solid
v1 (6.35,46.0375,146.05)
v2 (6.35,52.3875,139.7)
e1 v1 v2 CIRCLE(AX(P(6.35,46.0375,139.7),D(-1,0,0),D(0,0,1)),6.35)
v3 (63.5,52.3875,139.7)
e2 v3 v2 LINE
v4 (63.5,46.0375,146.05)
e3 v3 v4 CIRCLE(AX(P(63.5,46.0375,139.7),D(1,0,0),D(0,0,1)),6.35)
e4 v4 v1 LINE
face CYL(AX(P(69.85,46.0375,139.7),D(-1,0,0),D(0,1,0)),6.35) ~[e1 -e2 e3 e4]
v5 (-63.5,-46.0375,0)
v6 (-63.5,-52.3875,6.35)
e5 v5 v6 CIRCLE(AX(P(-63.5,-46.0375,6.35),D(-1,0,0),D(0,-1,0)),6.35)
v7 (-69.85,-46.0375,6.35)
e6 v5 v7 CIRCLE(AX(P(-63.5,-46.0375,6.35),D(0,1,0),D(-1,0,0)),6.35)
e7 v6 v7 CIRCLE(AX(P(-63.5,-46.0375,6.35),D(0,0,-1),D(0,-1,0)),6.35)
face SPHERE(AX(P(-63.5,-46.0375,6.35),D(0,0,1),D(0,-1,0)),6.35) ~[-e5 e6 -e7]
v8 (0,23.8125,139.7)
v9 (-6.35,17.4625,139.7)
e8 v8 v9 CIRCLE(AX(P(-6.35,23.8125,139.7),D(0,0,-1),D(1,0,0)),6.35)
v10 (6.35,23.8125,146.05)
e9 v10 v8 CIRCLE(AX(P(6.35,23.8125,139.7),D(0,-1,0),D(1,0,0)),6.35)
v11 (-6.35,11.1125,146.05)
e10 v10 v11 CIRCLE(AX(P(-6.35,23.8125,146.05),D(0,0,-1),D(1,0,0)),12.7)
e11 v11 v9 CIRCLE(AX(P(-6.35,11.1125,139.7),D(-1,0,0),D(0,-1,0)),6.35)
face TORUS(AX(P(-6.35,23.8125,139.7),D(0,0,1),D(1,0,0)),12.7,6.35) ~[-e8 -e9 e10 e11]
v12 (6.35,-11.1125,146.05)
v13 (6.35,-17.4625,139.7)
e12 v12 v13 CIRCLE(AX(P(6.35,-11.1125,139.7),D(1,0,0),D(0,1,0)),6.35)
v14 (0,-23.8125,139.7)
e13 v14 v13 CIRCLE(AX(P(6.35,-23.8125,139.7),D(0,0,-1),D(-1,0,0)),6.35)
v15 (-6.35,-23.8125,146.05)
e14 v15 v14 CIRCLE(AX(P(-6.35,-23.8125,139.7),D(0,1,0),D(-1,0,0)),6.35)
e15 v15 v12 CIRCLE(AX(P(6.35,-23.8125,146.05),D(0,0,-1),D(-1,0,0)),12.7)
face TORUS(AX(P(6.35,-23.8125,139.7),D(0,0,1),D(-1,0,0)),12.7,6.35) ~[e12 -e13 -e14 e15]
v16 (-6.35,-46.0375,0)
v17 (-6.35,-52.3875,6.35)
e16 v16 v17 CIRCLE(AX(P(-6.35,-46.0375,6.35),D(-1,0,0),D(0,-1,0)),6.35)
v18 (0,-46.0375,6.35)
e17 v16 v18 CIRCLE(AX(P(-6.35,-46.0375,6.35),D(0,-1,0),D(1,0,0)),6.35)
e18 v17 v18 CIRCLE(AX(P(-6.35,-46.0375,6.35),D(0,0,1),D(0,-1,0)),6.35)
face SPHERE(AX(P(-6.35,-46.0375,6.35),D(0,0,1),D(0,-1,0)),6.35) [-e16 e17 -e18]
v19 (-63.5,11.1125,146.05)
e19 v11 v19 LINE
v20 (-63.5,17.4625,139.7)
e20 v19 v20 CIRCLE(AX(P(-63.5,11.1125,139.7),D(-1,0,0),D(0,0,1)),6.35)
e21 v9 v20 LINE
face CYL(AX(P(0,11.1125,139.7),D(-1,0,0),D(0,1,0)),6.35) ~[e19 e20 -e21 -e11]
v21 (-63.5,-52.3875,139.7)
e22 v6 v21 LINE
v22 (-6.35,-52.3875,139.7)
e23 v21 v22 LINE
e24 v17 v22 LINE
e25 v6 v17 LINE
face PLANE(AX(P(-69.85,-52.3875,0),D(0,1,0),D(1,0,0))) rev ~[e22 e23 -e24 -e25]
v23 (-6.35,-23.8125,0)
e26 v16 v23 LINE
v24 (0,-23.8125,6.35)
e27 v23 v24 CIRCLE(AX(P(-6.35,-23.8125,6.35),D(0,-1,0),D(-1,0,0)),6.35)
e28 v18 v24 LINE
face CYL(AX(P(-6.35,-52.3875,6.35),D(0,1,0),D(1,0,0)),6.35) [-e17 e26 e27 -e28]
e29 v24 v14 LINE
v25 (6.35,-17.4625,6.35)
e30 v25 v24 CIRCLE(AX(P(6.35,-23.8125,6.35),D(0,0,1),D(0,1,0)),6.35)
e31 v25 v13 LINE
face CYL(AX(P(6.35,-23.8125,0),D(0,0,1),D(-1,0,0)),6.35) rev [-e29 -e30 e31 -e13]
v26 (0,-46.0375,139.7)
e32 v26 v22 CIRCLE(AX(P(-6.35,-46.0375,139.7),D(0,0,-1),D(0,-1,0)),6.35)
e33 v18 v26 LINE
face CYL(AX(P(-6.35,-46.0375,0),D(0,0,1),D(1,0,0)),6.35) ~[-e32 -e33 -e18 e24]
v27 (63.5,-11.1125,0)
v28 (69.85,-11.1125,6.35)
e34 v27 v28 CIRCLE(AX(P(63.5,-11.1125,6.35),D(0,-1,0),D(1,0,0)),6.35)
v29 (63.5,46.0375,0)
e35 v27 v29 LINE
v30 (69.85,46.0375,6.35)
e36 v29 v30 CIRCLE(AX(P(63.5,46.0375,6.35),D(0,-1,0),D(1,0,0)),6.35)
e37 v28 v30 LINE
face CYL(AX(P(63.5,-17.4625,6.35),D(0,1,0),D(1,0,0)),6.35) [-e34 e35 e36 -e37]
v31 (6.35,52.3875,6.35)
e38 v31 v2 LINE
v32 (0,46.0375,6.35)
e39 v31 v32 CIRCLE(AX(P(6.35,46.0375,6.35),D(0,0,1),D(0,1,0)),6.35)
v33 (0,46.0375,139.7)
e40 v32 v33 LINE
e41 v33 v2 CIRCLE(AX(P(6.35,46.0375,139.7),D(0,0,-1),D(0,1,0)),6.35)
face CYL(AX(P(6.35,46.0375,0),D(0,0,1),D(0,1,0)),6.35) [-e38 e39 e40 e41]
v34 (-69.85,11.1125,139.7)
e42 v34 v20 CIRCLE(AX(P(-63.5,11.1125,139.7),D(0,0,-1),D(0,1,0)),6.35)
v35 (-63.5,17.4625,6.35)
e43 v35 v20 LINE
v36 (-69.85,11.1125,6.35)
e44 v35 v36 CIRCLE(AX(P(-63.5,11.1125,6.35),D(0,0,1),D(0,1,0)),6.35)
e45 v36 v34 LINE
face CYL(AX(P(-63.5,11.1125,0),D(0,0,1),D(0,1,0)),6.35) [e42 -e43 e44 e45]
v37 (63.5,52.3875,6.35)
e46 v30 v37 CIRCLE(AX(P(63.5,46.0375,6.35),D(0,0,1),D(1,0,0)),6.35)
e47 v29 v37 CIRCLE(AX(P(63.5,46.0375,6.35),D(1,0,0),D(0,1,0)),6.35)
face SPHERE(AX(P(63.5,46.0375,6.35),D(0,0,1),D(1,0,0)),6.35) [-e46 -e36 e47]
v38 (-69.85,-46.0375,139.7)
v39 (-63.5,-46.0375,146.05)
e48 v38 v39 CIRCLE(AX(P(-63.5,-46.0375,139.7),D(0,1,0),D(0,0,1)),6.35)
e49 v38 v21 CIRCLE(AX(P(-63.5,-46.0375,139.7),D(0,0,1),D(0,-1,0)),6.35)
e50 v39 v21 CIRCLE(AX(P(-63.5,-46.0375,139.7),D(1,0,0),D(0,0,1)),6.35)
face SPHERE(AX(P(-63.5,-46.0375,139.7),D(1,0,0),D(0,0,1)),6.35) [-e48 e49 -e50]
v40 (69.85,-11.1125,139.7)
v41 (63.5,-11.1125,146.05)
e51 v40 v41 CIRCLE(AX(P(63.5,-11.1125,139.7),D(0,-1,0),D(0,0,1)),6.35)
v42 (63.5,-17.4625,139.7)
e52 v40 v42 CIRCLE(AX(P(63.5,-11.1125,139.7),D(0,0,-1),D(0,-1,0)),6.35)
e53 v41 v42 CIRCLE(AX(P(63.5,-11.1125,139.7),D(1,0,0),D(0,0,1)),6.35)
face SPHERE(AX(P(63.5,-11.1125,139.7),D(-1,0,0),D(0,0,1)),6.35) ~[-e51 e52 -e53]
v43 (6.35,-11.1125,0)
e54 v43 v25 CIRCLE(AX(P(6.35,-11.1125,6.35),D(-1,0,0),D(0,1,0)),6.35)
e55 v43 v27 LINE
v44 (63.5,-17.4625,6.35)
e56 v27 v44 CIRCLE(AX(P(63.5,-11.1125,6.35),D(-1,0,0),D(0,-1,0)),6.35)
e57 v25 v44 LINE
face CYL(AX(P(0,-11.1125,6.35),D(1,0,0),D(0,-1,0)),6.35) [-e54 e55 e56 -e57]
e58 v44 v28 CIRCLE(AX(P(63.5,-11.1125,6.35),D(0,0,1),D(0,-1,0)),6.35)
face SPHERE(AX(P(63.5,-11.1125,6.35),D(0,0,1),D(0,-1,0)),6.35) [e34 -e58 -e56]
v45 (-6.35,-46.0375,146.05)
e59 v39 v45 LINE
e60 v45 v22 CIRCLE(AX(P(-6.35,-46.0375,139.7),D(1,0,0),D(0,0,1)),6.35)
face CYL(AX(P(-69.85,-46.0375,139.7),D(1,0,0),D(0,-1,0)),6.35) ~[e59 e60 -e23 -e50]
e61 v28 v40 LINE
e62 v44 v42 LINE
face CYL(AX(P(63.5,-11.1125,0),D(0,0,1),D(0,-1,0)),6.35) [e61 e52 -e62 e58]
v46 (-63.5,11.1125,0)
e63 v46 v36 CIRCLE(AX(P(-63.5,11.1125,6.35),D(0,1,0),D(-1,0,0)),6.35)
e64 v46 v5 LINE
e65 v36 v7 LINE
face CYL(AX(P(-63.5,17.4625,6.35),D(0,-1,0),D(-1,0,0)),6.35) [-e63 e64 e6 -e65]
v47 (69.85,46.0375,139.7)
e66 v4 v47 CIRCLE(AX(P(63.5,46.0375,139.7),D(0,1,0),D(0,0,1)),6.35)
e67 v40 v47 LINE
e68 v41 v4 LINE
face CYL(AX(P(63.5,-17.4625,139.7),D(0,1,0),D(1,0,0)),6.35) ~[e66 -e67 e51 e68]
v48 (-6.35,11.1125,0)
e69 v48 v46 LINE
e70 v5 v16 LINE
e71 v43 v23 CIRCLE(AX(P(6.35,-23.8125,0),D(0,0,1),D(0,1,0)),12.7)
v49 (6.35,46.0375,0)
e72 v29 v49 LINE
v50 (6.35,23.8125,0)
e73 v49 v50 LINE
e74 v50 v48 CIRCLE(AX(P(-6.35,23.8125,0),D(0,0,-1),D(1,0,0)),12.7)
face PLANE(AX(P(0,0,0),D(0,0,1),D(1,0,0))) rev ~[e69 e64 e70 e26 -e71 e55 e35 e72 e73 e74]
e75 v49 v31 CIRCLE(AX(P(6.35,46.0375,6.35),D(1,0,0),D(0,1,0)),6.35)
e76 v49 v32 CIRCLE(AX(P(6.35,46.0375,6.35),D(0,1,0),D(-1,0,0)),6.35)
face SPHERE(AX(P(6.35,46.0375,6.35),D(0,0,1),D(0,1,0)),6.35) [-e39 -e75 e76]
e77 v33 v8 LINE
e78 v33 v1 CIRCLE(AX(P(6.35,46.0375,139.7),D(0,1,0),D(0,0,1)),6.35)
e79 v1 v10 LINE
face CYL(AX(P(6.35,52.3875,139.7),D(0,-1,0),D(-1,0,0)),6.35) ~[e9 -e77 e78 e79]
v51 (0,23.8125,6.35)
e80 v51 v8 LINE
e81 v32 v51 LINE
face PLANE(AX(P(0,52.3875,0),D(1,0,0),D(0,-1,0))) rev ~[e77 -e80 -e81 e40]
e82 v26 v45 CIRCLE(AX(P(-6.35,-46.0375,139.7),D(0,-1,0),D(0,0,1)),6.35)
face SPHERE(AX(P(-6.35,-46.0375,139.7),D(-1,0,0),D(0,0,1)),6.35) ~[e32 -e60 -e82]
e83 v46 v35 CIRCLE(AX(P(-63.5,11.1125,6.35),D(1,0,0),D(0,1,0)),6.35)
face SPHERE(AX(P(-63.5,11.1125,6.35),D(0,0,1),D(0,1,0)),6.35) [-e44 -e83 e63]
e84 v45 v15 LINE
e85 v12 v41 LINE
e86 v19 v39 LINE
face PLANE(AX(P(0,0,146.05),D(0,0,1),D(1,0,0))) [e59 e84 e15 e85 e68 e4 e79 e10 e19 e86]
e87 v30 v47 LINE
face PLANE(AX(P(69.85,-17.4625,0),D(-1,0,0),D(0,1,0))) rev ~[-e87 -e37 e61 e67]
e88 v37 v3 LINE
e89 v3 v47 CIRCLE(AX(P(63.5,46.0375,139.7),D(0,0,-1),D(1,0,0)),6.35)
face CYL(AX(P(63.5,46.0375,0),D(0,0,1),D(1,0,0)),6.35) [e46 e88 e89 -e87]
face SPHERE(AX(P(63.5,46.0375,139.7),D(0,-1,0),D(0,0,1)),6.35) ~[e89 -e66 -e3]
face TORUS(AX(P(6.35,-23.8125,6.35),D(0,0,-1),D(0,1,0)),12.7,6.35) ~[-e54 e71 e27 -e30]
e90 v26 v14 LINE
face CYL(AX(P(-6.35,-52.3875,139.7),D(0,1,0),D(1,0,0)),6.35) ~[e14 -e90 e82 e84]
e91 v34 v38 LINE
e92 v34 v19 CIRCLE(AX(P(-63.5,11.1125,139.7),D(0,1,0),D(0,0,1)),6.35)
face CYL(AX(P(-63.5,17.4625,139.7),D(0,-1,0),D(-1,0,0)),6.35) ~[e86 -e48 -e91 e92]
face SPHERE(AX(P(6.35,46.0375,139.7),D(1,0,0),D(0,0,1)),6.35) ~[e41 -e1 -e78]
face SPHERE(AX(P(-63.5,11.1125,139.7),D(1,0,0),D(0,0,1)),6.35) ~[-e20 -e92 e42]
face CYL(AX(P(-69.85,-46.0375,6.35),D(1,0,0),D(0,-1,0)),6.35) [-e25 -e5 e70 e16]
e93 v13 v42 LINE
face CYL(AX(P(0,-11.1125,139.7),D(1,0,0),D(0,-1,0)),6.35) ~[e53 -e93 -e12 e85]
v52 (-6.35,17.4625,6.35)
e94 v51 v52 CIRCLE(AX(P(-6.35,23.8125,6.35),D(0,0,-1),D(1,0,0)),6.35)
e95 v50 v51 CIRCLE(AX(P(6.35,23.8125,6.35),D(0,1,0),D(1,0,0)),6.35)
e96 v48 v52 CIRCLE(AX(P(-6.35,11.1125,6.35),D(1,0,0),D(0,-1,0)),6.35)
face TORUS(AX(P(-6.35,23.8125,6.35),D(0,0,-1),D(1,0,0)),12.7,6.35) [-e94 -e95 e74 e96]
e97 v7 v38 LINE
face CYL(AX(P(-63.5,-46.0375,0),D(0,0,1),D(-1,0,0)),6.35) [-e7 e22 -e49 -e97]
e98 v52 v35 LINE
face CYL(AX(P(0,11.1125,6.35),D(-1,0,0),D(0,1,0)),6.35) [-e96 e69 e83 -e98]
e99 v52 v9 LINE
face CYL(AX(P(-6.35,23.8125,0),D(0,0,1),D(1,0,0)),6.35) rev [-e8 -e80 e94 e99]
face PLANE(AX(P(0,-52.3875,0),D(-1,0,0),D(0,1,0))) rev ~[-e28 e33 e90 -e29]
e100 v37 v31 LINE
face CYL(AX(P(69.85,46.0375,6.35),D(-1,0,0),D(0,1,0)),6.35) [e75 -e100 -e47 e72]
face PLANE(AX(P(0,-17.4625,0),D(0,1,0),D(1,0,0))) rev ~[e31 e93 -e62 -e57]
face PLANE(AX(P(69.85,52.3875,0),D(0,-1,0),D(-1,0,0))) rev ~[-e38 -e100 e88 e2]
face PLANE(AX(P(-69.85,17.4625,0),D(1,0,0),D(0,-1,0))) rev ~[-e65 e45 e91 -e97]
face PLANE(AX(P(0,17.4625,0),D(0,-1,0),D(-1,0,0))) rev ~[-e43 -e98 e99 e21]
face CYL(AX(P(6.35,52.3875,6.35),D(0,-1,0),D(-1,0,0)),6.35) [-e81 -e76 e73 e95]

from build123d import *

# Parameters (mm, degrees)
F1_DEPTH = 146.05
F2_R     = 6.35


with BuildPart() as f1:
    # F0 (on Top) → F1 (new body)
    with BuildSketch(Plane.XY):
        Polygon((0, -52.3875), (0, -17.4625), (69.85, -17.4625), (69.85, 52.3875), (0, 52.3875), (0, 17.4625), (-69.85, 17.4625), (-69.85, -52.3875), align=None)
    extrude(amount=F1_DEPTH)

    # F2
    f2_edges = [f1.edges().sort_by_distance(p)[0] for p in [
        (-34.925, -52.3875, 146.05),
        (0, -34.925, 146.05),
        (34.925, -17.4625, 146.05),
        (69.85, 17.4625, 146.05),
        (34.925, 52.3875, 146.05),
        (0, 34.925, 146.05),
        (-34.925, 17.4625, 146.05),
        (-69.85, -17.4625, 146.05),
        (-69.85, -52.3875, 73.025),
        (0, -52.3875, 73.025),
        (-34.925, -52.3875, 0),
        (0, -17.4625, 73.025),
        (69.85, -17.4625, 73.025),
        (34.925, -17.4625, 0),
        (69.85, 52.3875, 73.025),
        (69.85, 17.4625, 0),
        (0, 52.3875, 73.025),
        (34.925, 52.3875, 0),
        (0, 17.4625, 73.025),
        (0, 34.925, 0),
        (-69.85, 17.4625, 73.025),
        (-34.925, 17.4625, 0),
        (-69.85, -17.4625, 0),
        (0, -34.925, 0),
    ]]
    fillet(f2_edges, radius=F2_R)


solid = f1.part
